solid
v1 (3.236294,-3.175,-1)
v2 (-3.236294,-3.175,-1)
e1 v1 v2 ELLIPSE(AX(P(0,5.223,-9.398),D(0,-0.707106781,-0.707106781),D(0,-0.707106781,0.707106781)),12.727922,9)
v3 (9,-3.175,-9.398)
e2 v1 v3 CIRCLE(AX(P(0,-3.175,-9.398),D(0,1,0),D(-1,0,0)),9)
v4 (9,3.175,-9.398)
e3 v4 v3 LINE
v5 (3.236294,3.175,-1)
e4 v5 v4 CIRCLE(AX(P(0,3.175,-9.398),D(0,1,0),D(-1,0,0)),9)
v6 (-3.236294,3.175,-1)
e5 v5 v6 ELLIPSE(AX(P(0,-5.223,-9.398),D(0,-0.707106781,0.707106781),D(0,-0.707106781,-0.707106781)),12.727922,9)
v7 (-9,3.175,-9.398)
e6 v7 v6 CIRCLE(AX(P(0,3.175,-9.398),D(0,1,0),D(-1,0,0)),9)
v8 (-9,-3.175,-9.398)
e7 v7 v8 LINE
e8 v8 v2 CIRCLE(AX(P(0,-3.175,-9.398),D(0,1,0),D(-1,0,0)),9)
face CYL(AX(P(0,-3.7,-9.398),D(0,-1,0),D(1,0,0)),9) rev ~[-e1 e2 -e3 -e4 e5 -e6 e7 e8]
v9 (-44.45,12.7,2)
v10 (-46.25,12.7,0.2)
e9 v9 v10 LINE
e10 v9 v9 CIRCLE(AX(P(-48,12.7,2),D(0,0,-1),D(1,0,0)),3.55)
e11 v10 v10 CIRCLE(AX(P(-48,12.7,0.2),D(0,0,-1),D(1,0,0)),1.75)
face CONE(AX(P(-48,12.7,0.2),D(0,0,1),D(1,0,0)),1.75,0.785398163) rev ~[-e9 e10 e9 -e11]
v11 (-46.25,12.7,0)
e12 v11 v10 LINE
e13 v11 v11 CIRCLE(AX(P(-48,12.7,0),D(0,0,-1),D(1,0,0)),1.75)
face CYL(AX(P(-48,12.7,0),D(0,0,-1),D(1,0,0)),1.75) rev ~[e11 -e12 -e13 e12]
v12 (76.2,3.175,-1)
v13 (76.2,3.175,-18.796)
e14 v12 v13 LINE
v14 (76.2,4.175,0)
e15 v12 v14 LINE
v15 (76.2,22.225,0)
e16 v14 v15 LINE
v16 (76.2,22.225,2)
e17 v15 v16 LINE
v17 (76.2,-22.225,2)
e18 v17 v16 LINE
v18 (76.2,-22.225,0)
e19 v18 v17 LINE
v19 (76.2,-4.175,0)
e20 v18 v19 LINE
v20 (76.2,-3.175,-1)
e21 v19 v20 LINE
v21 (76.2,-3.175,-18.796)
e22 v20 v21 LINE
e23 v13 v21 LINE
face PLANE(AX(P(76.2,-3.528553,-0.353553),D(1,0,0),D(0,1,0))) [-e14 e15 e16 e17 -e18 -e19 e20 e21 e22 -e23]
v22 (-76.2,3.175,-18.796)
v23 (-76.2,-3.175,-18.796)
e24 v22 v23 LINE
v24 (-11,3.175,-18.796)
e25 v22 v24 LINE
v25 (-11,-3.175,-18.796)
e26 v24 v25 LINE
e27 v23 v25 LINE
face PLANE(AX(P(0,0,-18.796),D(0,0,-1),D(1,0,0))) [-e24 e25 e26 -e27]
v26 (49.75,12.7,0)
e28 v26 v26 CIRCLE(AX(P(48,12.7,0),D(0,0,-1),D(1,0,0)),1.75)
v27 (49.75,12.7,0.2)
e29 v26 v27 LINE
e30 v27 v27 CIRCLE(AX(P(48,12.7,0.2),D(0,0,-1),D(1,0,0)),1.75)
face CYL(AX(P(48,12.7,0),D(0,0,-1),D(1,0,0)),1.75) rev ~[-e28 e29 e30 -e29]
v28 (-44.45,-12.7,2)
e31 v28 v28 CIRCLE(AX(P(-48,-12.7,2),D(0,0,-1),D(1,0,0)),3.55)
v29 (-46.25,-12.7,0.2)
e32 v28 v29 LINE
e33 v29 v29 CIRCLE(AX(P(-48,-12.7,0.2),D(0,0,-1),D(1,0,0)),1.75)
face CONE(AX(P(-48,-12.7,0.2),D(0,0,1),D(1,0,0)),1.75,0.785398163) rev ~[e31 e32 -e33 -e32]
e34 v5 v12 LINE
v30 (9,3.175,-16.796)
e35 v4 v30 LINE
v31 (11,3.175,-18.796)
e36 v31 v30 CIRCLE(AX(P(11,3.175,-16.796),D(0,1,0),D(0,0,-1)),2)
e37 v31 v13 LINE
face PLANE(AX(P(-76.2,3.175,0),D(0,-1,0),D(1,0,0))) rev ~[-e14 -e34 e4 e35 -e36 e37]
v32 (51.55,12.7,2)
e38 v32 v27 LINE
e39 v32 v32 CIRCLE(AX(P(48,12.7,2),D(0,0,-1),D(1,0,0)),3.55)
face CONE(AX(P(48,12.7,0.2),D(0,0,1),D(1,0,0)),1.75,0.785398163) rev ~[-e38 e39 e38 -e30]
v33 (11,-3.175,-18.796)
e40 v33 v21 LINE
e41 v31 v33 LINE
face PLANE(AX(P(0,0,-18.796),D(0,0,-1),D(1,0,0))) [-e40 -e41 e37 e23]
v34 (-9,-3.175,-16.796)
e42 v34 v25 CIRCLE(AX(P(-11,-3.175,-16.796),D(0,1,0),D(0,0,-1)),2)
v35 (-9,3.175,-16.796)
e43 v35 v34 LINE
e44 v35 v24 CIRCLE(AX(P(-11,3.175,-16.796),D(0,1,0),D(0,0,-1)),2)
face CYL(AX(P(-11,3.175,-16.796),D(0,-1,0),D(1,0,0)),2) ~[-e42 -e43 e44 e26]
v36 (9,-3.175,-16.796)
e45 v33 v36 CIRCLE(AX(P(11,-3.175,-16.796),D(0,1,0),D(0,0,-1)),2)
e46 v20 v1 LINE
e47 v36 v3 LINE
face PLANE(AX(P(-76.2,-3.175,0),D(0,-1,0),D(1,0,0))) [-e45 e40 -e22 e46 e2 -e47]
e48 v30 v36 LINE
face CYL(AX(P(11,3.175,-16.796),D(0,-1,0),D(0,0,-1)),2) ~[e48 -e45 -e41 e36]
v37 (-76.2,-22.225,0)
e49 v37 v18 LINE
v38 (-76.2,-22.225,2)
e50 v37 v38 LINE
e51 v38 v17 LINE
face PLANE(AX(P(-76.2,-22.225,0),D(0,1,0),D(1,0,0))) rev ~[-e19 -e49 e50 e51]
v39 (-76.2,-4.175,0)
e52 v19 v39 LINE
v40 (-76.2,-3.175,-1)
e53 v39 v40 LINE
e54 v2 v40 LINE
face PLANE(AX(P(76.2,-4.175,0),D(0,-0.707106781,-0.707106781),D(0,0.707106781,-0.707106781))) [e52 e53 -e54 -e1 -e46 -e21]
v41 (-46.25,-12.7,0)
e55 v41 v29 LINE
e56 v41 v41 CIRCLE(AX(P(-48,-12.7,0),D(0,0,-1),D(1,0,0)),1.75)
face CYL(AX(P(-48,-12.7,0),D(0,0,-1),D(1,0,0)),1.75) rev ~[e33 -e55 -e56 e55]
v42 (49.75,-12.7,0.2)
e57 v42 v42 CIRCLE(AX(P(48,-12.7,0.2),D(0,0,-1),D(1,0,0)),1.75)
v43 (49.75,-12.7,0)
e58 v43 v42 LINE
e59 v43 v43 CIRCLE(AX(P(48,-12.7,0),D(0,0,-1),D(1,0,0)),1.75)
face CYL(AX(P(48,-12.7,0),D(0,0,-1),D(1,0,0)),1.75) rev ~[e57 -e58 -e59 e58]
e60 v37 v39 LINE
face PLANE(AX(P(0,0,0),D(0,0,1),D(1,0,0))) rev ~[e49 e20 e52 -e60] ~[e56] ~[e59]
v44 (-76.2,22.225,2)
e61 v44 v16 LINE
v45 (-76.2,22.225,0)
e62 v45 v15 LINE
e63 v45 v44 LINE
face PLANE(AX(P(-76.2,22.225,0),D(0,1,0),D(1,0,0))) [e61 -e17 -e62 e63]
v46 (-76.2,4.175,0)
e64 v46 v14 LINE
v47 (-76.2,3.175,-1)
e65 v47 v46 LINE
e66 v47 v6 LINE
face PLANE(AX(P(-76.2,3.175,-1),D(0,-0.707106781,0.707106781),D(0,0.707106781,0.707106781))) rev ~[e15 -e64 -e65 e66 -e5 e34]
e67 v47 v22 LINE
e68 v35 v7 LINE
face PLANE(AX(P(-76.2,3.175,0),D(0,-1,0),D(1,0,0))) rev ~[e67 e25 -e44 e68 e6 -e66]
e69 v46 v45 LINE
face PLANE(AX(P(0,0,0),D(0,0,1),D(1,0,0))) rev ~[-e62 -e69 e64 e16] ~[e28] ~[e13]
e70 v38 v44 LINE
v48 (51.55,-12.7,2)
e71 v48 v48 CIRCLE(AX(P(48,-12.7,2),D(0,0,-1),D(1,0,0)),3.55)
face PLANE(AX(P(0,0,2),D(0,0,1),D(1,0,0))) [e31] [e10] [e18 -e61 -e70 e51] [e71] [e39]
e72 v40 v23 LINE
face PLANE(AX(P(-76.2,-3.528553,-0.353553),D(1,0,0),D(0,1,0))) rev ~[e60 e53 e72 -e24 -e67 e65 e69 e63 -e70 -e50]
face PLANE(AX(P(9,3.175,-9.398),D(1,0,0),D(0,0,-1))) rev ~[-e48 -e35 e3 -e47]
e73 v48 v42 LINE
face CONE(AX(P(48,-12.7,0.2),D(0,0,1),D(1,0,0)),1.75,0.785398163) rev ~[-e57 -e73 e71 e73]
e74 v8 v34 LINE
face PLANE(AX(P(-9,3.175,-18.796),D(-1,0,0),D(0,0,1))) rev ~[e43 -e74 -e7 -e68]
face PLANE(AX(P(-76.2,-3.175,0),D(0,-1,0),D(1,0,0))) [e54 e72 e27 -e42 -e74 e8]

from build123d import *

# Parameters (mm, degrees)
F0_W         = 152.4
F0_H         = 44.45
F1_DEPTH     = 2
F2_W         = 152.4
F2_H         = 6.35
F3_DEPTH     = 18.796
F4_R         = 1.75
F5_DEPTH     = 25
F7_DEPTH     = 25.401
F8_SIZE      = 1.8
F9_T4_DEPTH  = 152.4
F9_S5_R      = 9
F9_T6_DEPTH  = 78
F9_T10_DEPTH = 152.4
F9_S11_R     = 9
F9_T12_DEPTH = 78
F10_R        = 2


# Not quite as in the source:
# - a fillet or chamfer that OpenCascade refuses, or shapes differently, is made with other operations: its cross-section is extruded or revolved along the edge and cut away or added
# - a feature names something its author has since deleted; it is built from what else it names


with BuildPart() as f1:
    # F0 (on Top) → F1 (new body)
    with BuildSketch(Plane.XY):
        Rectangle(F0_W, F0_H)
    extrude(amount=F1_DEPTH)

    # F2 (on face) → F3 (join)
    with BuildSketch(Plane(origin=(0, 0, 0), x_dir=(1, 0, 0), z_dir=(0, 0, -1))):
        Rectangle(F2_W, F2_H)
    extrude(amount=F3_DEPTH)

    # F4 (on face) → F5 (cut)
    with BuildSketch(Plane(origin=(0, 0, 0), x_dir=(1, 0, 0), z_dir=(0, 0, -1))):
        with Locations((48, -12.7)):
            Circle(F4_R)
        with Locations((-48, -12.7)):
            Circle(F4_R)
        with Locations((-48, 12.7)):
            Circle(F4_R)
        with Locations((48, 12.7)):
            Circle(F4_R)
    extrude(amount=-F5_DEPTH, mode=Mode.SUBTRACT)

    # F6 (on face) → F7 (cut, through all)
    with BuildSketch(Plane(origin=(0, 3.175, 0), x_dir=(-1, 0, 0), z_dir=(0, 1, 0))):
        with BuildLine():
            ThreePointArc((-9, -9.398), (0, -18.398), (9, -9.398))
            ThreePointArc((9, -9.398), (0, -0.398), (-9, -9.398))
        make_face()
        with BuildLine():
            Line((9, -18.796), (9, -9.398))
            ThreePointArc((9, -9.398), (0, -18.398), (-9, -9.398))
            Line((-9, -9.398), (-9, -18.796))
            Line((-9, -18.796), (9, -18.796))
        make_face()
    extrude(amount=-F7_DEPTH, mode=Mode.SUBTRACT)

    # F8
    f8_edges = [f1.edges().sort_by_distance(p)[0] for p in [
        (46.25, -12.7, 2),
        (-49.75, -12.7, 2),
        (-49.75, 12.7, 2),
        (46.25, 12.7, 2),
    ]]
    chamfer(f8_edges, length=F8_SIZE)

    # F9: chamfer of 1 on 2 edges, made by hand


with BuildPart() as f9_tool2:
    # F9_s3 → F9_t4 (new body)
    with BuildSketch(Plane.YZ.offset(-76.2)):
        Polygon((3.175, -1), (4.175, 0), (3.175, 0), align=None)
    extrude(amount=F9_T4_DEPTH)

    # F9_s5 → F9_t6 (cut, symmetric)
    with BuildSketch(Plane.XZ.offset(-3.7)):
        with Locations((0, -9.398)):
            Circle(F9_S5_R)
    extrude(amount=F9_T6_DEPTH, both=True, mode=Mode.SUBTRACT)


with BuildPart() as f1_1:
    add(f1.part)

    # F9_t1: union F9_tool2
    add(f9_tool2.part)


with BuildPart() as f9_tool8:
    # F9_s9 → F9_t10 (new body)
    with BuildSketch(Plane.YZ.offset(76.2)):
        Polygon((-4.175, 0), (-3.175, -1), (-3.175, 0), align=None)
    extrude(amount=-F9_T10_DEPTH)

    # F9_s11 → F9_t12 (cut, symmetric)
    with BuildSketch(Plane.XZ.offset(3.7)):
        with Locations((0, -9.398)):
            Circle(F9_S11_R)
    extrude(amount=F9_T12_DEPTH, both=True, mode=Mode.SUBTRACT)


with BuildPart() as f1_2:
    add(f1_1.part)

    # F9_t7: union F9_tool8
    add(f9_tool8.part)

    # F10
    f10_edges = [f1_2.edges().sort_by_distance(p)[0] for p in [
        (9, 0, -18.796),
        (-9, 0, -18.796),
    ]]
    fillet(f10_edges, radius=F10_R)


solid = f1_2.part
